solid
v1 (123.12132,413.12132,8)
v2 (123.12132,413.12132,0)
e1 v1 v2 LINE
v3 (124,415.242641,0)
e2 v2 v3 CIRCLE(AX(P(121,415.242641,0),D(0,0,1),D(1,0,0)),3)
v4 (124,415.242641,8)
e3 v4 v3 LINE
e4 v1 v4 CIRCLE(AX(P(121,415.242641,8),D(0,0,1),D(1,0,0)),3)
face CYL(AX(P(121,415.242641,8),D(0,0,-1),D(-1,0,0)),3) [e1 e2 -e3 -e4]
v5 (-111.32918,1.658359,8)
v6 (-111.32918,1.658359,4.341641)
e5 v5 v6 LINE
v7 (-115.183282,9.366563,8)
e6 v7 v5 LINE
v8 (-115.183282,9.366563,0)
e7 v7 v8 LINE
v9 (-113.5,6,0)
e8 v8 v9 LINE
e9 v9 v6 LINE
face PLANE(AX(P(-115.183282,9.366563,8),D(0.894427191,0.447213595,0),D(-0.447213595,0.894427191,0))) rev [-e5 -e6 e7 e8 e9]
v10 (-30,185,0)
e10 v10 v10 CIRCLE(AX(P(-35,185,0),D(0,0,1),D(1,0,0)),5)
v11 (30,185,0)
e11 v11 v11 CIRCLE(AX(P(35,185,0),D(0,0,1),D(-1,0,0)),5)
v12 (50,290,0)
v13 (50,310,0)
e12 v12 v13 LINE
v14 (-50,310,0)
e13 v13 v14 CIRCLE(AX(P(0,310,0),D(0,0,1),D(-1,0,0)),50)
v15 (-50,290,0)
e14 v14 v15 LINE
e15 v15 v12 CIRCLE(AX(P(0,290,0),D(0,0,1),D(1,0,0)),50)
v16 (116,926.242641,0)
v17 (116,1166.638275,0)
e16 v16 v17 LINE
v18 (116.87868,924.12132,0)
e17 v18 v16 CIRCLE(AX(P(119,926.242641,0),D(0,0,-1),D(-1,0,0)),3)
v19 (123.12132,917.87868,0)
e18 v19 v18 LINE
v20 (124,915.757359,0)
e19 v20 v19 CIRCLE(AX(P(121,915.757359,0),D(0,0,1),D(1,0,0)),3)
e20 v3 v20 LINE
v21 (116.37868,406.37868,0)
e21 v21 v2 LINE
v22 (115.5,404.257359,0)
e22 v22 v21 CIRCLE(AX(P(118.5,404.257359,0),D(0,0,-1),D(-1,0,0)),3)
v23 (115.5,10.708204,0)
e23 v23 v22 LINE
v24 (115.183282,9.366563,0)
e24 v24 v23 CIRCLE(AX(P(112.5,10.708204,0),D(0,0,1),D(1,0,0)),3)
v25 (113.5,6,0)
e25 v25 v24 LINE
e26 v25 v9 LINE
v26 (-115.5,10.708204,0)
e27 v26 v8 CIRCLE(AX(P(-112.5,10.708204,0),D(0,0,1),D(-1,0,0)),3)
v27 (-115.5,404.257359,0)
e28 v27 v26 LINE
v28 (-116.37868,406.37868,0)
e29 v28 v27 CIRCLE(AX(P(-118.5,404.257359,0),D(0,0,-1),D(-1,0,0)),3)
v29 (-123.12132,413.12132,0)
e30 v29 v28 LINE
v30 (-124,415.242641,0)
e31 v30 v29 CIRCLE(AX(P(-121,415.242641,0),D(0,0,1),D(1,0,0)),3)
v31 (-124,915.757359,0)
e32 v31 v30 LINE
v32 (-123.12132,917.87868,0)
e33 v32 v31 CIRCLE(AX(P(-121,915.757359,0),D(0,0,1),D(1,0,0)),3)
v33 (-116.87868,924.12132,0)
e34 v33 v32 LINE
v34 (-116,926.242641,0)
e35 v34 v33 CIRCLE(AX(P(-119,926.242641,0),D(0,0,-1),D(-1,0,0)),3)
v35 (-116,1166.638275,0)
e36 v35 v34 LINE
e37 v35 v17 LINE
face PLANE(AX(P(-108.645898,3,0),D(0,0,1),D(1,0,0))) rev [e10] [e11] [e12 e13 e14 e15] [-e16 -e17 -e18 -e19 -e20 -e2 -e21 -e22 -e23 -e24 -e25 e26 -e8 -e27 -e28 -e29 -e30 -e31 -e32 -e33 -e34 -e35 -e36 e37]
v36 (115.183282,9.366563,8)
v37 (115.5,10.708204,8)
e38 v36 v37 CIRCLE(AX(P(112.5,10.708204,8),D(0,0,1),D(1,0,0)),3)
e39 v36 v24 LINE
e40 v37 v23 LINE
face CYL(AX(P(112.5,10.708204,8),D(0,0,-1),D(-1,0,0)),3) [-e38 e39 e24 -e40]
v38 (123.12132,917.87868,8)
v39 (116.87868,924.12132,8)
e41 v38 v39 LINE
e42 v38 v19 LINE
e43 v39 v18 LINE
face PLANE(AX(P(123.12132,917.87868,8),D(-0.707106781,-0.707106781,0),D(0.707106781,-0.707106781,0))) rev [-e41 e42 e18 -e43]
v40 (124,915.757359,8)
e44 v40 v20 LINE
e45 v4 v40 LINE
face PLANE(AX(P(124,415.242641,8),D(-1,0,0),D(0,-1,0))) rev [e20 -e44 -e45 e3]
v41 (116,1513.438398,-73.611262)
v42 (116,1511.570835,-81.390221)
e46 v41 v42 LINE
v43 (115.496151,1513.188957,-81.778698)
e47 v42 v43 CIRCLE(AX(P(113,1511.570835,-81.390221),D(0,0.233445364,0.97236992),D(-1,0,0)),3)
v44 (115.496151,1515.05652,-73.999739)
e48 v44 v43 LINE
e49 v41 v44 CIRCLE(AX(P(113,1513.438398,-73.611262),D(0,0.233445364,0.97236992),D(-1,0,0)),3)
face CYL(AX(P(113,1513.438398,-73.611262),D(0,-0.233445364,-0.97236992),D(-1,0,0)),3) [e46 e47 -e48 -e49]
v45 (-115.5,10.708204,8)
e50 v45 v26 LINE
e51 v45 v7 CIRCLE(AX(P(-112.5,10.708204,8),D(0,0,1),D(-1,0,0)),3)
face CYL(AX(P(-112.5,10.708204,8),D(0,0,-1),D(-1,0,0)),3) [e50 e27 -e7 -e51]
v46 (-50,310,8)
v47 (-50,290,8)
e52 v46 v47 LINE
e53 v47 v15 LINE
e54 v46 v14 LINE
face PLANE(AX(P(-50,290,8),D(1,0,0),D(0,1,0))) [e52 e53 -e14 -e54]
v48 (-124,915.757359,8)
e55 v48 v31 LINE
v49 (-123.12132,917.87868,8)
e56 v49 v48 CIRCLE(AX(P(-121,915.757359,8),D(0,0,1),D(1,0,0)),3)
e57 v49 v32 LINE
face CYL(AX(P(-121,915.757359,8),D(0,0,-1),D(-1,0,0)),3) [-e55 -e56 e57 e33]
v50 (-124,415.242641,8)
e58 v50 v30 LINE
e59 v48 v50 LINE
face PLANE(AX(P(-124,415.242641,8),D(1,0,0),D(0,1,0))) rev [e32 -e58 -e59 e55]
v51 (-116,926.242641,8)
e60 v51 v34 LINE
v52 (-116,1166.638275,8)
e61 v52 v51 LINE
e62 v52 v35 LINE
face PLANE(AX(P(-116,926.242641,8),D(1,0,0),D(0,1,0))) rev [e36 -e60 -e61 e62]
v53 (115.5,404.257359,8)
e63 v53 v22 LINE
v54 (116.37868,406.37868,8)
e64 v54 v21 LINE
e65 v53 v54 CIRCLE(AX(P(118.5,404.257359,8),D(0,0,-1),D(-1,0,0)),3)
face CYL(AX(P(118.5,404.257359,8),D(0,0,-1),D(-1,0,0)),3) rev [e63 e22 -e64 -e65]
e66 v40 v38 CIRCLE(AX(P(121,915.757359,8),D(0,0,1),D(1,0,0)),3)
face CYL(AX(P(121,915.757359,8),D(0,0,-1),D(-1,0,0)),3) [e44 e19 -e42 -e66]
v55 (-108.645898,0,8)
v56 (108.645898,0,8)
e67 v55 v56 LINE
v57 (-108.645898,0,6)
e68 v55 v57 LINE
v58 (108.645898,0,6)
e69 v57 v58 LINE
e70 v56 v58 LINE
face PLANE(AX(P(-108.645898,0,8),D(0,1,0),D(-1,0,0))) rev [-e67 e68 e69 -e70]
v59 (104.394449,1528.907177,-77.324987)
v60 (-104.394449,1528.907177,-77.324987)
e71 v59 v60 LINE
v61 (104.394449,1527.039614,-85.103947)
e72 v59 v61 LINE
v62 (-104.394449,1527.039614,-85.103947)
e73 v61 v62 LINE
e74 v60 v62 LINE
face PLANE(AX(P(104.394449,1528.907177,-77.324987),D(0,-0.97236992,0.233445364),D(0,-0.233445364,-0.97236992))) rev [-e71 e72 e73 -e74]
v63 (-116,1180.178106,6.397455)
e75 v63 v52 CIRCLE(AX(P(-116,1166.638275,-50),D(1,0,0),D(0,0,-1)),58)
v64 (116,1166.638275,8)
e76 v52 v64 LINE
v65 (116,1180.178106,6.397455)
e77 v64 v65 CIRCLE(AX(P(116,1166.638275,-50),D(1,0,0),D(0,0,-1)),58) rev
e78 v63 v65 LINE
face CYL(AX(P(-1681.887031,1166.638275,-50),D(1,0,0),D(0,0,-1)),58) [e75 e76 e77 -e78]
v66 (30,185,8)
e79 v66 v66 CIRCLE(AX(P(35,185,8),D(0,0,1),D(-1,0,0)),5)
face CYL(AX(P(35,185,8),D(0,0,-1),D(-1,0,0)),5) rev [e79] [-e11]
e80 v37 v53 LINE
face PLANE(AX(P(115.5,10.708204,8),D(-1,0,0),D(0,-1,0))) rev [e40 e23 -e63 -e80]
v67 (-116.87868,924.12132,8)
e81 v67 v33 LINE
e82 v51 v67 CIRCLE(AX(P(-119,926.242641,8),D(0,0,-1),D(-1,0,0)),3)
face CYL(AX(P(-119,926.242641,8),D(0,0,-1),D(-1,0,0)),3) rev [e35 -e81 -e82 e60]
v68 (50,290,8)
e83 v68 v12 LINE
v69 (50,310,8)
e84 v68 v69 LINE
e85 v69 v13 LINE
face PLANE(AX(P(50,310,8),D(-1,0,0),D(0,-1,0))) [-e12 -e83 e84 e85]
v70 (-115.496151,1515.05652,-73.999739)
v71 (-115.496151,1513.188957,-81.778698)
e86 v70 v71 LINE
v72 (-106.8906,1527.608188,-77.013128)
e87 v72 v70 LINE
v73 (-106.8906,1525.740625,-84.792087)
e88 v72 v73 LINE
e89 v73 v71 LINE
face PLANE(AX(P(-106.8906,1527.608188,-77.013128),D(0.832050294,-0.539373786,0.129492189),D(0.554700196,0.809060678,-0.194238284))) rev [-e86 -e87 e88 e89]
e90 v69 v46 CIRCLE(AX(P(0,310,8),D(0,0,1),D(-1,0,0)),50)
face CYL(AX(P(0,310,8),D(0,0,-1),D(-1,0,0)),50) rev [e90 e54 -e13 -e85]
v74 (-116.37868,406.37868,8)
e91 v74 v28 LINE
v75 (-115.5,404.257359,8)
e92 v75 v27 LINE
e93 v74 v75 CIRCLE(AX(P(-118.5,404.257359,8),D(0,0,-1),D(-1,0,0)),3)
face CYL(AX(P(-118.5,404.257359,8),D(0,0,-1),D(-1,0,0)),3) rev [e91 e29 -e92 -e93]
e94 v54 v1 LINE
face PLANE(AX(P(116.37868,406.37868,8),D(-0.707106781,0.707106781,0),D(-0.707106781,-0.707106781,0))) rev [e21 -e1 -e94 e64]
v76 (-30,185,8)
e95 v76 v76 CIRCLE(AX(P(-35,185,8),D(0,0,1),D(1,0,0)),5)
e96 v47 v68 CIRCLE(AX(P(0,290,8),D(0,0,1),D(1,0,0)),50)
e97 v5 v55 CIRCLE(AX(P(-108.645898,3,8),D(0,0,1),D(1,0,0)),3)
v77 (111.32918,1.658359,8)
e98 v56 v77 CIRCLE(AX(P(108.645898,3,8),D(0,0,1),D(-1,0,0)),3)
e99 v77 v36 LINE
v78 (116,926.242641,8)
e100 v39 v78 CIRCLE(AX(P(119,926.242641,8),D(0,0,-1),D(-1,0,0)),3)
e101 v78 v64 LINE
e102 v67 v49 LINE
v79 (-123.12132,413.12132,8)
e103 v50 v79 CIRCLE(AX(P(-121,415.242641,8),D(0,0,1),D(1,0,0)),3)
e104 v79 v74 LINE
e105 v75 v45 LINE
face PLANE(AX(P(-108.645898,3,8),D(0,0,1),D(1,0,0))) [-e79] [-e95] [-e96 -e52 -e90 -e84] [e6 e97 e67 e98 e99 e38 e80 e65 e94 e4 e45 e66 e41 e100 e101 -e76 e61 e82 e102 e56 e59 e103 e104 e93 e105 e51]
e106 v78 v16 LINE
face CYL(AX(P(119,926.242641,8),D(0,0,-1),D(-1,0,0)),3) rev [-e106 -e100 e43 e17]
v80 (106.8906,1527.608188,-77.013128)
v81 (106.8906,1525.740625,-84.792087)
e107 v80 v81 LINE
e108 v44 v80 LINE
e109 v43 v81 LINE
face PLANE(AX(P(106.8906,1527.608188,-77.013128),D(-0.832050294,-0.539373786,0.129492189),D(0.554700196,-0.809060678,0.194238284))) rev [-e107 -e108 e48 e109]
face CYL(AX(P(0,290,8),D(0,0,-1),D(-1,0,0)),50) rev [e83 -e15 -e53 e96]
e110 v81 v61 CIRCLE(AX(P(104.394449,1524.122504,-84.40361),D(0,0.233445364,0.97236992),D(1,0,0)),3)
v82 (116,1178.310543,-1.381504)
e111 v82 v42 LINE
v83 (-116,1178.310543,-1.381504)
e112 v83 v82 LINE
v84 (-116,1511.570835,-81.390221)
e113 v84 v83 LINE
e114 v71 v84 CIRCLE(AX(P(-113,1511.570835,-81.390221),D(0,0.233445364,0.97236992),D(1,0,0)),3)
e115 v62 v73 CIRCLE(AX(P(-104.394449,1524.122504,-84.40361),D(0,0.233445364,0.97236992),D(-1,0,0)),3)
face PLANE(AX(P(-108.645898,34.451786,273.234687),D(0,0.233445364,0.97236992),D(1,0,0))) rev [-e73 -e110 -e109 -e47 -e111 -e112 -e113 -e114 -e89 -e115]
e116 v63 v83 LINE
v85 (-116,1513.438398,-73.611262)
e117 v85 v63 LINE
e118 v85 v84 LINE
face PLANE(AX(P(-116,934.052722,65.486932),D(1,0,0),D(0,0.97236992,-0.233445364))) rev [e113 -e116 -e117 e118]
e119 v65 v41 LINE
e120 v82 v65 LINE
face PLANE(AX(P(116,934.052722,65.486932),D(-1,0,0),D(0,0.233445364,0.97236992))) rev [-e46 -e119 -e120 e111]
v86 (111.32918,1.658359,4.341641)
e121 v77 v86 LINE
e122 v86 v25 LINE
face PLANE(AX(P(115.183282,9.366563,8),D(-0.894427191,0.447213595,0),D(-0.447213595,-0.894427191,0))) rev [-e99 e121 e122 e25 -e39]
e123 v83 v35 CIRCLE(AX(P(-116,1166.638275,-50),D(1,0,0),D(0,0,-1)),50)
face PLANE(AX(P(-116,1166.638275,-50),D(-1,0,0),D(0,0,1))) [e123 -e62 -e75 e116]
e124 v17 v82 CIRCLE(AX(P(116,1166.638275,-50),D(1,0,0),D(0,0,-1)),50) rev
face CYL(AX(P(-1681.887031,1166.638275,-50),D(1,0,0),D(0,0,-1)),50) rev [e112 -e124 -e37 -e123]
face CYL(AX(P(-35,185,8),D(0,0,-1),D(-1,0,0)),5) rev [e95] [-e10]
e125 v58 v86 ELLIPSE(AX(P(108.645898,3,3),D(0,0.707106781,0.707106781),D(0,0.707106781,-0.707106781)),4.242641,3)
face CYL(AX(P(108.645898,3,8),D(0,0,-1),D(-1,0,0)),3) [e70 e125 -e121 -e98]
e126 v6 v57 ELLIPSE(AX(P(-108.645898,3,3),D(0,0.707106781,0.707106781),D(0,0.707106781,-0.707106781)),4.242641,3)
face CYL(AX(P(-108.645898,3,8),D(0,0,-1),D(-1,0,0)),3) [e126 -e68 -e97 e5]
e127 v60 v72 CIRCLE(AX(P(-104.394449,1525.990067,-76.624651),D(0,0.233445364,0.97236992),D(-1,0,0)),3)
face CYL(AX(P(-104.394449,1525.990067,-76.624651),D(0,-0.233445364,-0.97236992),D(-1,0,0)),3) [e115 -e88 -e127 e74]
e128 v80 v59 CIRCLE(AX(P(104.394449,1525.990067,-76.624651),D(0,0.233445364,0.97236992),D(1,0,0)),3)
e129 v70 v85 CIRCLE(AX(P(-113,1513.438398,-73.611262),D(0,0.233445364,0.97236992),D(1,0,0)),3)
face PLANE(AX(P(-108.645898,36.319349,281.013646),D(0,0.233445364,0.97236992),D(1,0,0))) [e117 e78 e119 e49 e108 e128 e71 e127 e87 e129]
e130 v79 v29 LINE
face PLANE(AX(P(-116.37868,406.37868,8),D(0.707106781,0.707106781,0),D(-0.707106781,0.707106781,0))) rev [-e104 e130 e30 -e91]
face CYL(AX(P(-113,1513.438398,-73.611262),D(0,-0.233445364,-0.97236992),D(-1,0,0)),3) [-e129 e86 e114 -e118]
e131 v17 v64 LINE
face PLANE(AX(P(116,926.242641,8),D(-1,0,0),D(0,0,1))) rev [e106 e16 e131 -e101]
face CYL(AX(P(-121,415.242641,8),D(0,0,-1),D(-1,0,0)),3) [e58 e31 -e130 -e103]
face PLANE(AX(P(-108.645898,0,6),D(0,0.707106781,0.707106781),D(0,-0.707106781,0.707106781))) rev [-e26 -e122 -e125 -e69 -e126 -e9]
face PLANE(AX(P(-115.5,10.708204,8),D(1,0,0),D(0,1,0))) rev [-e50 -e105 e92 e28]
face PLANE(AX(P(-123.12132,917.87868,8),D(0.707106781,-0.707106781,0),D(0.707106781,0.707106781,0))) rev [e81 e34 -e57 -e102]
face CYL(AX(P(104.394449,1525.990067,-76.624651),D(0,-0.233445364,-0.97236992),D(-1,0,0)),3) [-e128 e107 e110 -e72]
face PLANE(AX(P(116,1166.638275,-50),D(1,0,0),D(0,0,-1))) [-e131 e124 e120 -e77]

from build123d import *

# Parameters (mm, degrees)
SKETCH1_R              = 5
EXTRUDE1_DEPTH         = 8
PROCESS_BENDS1_START   = -116
PROCESS_BENDS1_DEPTH   = 232
PROCESS_BENDS1_2_DEPTH = 232
PROCESS_BENDS1_START_2 = 273
PROCESS_BENDS1_3_DEPTH = 10
SK_RPNING1_SIZE        = 6


with BuildPart() as part:
    # Sketch1 → Extrude1 (new body)
    with BuildSketch(Plane.XY):
        with BuildLine():
            Line((-108.645898034, 0), (108.645898034, 0))
            ThreePointArc((108.645898034, 0), (110.22309137, 0.448047575), (111.329179607, 1.658359214))
            Line((111.329179607, 1.658359214), (115.183281573, 9.366563146))
            ThreePointArc((115.183281573, 9.366563146), (115.419746968, 10.018945171), (115.5, 10.708203932))
            Line((115.5, 10.708203932), (115.5, 404.257359313))
            ThreePointArc((115.5, 404.257359313), (115.728361402, 405.40540961), (116.378679656, 406.378679656))
            Line((116.378679656, 406.378679656), (123.121320344, 413.121320344))
            ThreePointArc((123.121320344, 413.121320344), (123.771638598, 414.09459039), (124, 415.242640687))
            Line((124, 415.242640687), (124, 915.757359313))
            ThreePointArc((124, 915.757359313), (123.771638598, 916.90540961), (123.121320344, 917.878679656))
            Line((123.121320344, 917.878679656), (116.878679656, 924.121320344))
            ThreePointArc((116.878679656, 924.121320344), (116.228361402, 925.09459039), (116, 926.242640687))
            Line((116, 926.242640687), (116, 1522.091673087))
            ThreePointArc((116, 1522.091673087), (115.871276079, 1522.961025533), (115.496150883, 1523.755773675))
            Line((115.496150883, 1523.755773675), (106.890599608, 1536.664100589))
            ThreePointArc((106.890599608, 1536.664100589), (105.810022501, 1537.645023796), (104.394448725, 1538))
            Line((104.394448725, 1538), (-104.394448725, 1538))
            ThreePointArc((-104.394448725, 1538), (-105.810022501, 1537.645023796), (-106.890599608, 1536.664100589))
            Line((-106.890599608, 1536.664100589), (-115.496150883, 1523.755773675))
            ThreePointArc((-115.496150883, 1523.755773675), (-115.871276079, 1522.961025533), (-116, 1522.091673087))
            Line((-116, 1522.091673087), (-116, 926.242640687))
            ThreePointArc((-116, 926.242640687), (-116.228361402, 925.09459039), (-116.878679656, 924.121320344))
            Line((-116.878679656, 924.121320344), (-123.121320344, 917.878679656))
            ThreePointArc((-123.121320344, 917.878679656), (-123.771638598, 916.90540961), (-124, 915.757359313))
            Line((-124, 915.757359313), (-124, 415.242640687))
            ThreePointArc((-124, 415.242640687), (-123.771638598, 414.09459039), (-123.121320344, 413.121320344))
            Line((-123.121320344, 413.121320344), (-116.378679656, 406.378679656))
            ThreePointArc((-116.378679656, 406.378679656), (-115.728361402, 405.40540961), (-115.5, 404.257359313))
            Line((-115.5, 404.257359313), (-115.5, 10.708203932))
            ThreePointArc((-115.5, 10.708203932), (-115.419746968, 10.018945171), (-115.183281573, 9.366563146))
            Line((-115.183281573, 9.366563146), (-111.329179607, 1.658359214))
            ThreePointArc((-111.329179607, 1.658359214), (-110.22309137, 0.448047575), (-108.645898034, 0))
        make_face()
        with Locations((-35, 185)):
            Circle(SKETCH1_R, mode=Mode.SUBTRACT)
        with Locations(Location((35, 185, 0), (0, 0, 180))):
            Circle(SKETCH1_R, mode=Mode.SUBTRACT)
        with BuildLine():
            Line((-50, 290), (-50, 310))
            ThreePointArc((-50, 310), (0, 360), (50, 310))
            Line((50, 310), (50, 290))
            ThreePointArc((50, 290), (0, 240), (-50, 290))
        make_face(mode=Mode.SUBTRACT)
    extrude(amount=EXTRUDE1_DEPTH)

    # Process-Bends1: read off the stored shape, not the designer's step
    # Process-Bends1 outline → Process-Bends1 (cut)
    with BuildSketch(Plane.YZ.offset(PROCESS_BENDS1_START)):
        with BuildLine():
            Line((1180.17810598, 6.397455383), (1206.825425416, 0))
            Line((1206.825425416, 0), (1538, 0))
            Line((1538, 0), (1538, 8))
            Line((1538, 8), (1166.638274876, 8))
            ThreePointArc((1166.638274876, 8), (1173.455443929, 7.597970503), (1180.17810598, 6.397455383))
        make_face()
    extrude(amount=PROCESS_BENDS1_DEPTH, mode=Mode.SUBTRACT)

    # Process-Bends1 2 outline → Process-Bends1 2 (add)
    with BuildSketch(Plane.YZ.offset(PROCESS_BENDS1_START)):
        with BuildLine():
            Line((1527.039613862, -85.103946551), (1528.907176773, -77.324987188))
            Line((1528.907176773, -77.324987188), (1206.825425416, 0))
            Line((1206.825425416, 0), (1166.638274876, 0))
            ThreePointArc((1166.638274876, 0), (1172.515144749, -0.346577152), (1178.310543069, -1.38150398))
            Line((1178.310543069, -1.38150398), (1527.039613862, -85.103946551))
        make_face()
    extrude(amount=PROCESS_BENDS1_2_DEPTH)

    # Process-Bends1 3 outline → Process-Bends1 3 (cut)
    with BuildSketch(Plane(origin=(0, 0, 0), x_dir=(1, 0, 0), z_dir=(0, 0.2334453638559061, 0.9723699203976764)).offset(PROCESS_BENDS1_START_2)):
        with BuildLine():
            ThreePointArc((-116, 1488.806182631), (-115.871276079, 1489.675535077), (-115.496150883, 1490.470283219))
            Line((-115.496150883, 1490.470283219), (-106.890599608, 1503.378610132))
            ThreePointArc((-106.890599608, 1503.378610132), (-105.810022502, 1504.35953334), (-104.394448725, 1504.714509544))
            Line((-104.394448725, 1504.714509544), (-116, 1504.714509543))
            Line((-116, 1504.714509543), (-116, 1488.806182631))
        make_face()
        with BuildLine():
            Line((116, 1504.714509543), (104.394448725, 1504.714509544))
            ThreePointArc((104.394448725, 1504.714509544), (105.810022502, 1504.35953334), (106.890599608, 1503.378610132))
            Line((106.890599608, 1503.378610132), (115.496150883, 1490.470283219))
            ThreePointArc((115.496150883, 1490.470283219), (115.871276079, 1489.675535077), (116, 1488.806182631))
            Line((116, 1488.806182631), (116, 1504.714509543))
        make_face()
    extrude(amount=PROCESS_BENDS1_3_DEPTH, mode=Mode.SUBTRACT)

    # Skærpning1
    # the kernel refuses this chamfer: 6 mm, written as the material it takes off along each edge
    with BuildSketch(Plane(origin=(-124.075995962, 0, 0), x_dir=(0, 1, 0), z_dir=(1, 0, 0))) as sk_rpning1_piece_1:
        Polygon((SK_RPNING1_SIZE, 0), (0, SK_RPNING1_SIZE), (0, 0), align=None)
    extrude(amount=248.151991923, mode=Mode.SUBTRACT)
    with BuildSketch(Plane(origin=(-108.645898034, 3, 0), x_dir=(0.03163904554191759, -0.9994993600784327, 0), z_dir=(-0.9994993600784327, -0.03163904554191759, 0))) as sk_rpning1_piece_2_section:
        Polygon((0, 3), (3, SK_RPNING1_SIZE), (3, 0), (0, 0), align=None)
    sk_rpning1_piece_2 = revolve(axis=Axis((-108.645898034, 3, 0), (0, 0, 1)), revolution_arc=358.186913645, mode=Mode.PRIVATE)
    sk_rpning1_piece_2 = split(sk_rpning1_piece_2, bisect_by=Plane(origin=(-108.645898034, 4.5, 1.5), z_dir=(0, -0.7071067811865483, -0.7071067811865468)), keep=Keep.TOP, mode=Mode.PRIVATE)
    add(sk_rpning1_piece_2, mode=Mode.SUBTRACT)
    with BuildSketch(Plane(origin=(108.645898034, 3, 0), x_dir=(0, -1, 0), z_dir=(-1, 0, 0))) as sk_rpning1_piece_3_section:
        Polygon((0, 3), (3, SK_RPNING1_SIZE), (3, 0), (0, 0), align=None)
    sk_rpning1_piece_3 = revolve(axis=Axis((108.645898034, 3, 0), (0, 0, 1)), revolution_arc=358.186913645, mode=Mode.PRIVATE)
    sk_rpning1_piece_3 = split(sk_rpning1_piece_3, bisect_by=Plane(origin=(108.645898034, 4.5, 1.5), z_dir=(0, -0.7071067811865483, -0.7071067811865468)), keep=Keep.TOP, mode=Mode.PRIVATE)
    add(sk_rpning1_piece_3, mode=Mode.SUBTRACT)


solid = part.part
